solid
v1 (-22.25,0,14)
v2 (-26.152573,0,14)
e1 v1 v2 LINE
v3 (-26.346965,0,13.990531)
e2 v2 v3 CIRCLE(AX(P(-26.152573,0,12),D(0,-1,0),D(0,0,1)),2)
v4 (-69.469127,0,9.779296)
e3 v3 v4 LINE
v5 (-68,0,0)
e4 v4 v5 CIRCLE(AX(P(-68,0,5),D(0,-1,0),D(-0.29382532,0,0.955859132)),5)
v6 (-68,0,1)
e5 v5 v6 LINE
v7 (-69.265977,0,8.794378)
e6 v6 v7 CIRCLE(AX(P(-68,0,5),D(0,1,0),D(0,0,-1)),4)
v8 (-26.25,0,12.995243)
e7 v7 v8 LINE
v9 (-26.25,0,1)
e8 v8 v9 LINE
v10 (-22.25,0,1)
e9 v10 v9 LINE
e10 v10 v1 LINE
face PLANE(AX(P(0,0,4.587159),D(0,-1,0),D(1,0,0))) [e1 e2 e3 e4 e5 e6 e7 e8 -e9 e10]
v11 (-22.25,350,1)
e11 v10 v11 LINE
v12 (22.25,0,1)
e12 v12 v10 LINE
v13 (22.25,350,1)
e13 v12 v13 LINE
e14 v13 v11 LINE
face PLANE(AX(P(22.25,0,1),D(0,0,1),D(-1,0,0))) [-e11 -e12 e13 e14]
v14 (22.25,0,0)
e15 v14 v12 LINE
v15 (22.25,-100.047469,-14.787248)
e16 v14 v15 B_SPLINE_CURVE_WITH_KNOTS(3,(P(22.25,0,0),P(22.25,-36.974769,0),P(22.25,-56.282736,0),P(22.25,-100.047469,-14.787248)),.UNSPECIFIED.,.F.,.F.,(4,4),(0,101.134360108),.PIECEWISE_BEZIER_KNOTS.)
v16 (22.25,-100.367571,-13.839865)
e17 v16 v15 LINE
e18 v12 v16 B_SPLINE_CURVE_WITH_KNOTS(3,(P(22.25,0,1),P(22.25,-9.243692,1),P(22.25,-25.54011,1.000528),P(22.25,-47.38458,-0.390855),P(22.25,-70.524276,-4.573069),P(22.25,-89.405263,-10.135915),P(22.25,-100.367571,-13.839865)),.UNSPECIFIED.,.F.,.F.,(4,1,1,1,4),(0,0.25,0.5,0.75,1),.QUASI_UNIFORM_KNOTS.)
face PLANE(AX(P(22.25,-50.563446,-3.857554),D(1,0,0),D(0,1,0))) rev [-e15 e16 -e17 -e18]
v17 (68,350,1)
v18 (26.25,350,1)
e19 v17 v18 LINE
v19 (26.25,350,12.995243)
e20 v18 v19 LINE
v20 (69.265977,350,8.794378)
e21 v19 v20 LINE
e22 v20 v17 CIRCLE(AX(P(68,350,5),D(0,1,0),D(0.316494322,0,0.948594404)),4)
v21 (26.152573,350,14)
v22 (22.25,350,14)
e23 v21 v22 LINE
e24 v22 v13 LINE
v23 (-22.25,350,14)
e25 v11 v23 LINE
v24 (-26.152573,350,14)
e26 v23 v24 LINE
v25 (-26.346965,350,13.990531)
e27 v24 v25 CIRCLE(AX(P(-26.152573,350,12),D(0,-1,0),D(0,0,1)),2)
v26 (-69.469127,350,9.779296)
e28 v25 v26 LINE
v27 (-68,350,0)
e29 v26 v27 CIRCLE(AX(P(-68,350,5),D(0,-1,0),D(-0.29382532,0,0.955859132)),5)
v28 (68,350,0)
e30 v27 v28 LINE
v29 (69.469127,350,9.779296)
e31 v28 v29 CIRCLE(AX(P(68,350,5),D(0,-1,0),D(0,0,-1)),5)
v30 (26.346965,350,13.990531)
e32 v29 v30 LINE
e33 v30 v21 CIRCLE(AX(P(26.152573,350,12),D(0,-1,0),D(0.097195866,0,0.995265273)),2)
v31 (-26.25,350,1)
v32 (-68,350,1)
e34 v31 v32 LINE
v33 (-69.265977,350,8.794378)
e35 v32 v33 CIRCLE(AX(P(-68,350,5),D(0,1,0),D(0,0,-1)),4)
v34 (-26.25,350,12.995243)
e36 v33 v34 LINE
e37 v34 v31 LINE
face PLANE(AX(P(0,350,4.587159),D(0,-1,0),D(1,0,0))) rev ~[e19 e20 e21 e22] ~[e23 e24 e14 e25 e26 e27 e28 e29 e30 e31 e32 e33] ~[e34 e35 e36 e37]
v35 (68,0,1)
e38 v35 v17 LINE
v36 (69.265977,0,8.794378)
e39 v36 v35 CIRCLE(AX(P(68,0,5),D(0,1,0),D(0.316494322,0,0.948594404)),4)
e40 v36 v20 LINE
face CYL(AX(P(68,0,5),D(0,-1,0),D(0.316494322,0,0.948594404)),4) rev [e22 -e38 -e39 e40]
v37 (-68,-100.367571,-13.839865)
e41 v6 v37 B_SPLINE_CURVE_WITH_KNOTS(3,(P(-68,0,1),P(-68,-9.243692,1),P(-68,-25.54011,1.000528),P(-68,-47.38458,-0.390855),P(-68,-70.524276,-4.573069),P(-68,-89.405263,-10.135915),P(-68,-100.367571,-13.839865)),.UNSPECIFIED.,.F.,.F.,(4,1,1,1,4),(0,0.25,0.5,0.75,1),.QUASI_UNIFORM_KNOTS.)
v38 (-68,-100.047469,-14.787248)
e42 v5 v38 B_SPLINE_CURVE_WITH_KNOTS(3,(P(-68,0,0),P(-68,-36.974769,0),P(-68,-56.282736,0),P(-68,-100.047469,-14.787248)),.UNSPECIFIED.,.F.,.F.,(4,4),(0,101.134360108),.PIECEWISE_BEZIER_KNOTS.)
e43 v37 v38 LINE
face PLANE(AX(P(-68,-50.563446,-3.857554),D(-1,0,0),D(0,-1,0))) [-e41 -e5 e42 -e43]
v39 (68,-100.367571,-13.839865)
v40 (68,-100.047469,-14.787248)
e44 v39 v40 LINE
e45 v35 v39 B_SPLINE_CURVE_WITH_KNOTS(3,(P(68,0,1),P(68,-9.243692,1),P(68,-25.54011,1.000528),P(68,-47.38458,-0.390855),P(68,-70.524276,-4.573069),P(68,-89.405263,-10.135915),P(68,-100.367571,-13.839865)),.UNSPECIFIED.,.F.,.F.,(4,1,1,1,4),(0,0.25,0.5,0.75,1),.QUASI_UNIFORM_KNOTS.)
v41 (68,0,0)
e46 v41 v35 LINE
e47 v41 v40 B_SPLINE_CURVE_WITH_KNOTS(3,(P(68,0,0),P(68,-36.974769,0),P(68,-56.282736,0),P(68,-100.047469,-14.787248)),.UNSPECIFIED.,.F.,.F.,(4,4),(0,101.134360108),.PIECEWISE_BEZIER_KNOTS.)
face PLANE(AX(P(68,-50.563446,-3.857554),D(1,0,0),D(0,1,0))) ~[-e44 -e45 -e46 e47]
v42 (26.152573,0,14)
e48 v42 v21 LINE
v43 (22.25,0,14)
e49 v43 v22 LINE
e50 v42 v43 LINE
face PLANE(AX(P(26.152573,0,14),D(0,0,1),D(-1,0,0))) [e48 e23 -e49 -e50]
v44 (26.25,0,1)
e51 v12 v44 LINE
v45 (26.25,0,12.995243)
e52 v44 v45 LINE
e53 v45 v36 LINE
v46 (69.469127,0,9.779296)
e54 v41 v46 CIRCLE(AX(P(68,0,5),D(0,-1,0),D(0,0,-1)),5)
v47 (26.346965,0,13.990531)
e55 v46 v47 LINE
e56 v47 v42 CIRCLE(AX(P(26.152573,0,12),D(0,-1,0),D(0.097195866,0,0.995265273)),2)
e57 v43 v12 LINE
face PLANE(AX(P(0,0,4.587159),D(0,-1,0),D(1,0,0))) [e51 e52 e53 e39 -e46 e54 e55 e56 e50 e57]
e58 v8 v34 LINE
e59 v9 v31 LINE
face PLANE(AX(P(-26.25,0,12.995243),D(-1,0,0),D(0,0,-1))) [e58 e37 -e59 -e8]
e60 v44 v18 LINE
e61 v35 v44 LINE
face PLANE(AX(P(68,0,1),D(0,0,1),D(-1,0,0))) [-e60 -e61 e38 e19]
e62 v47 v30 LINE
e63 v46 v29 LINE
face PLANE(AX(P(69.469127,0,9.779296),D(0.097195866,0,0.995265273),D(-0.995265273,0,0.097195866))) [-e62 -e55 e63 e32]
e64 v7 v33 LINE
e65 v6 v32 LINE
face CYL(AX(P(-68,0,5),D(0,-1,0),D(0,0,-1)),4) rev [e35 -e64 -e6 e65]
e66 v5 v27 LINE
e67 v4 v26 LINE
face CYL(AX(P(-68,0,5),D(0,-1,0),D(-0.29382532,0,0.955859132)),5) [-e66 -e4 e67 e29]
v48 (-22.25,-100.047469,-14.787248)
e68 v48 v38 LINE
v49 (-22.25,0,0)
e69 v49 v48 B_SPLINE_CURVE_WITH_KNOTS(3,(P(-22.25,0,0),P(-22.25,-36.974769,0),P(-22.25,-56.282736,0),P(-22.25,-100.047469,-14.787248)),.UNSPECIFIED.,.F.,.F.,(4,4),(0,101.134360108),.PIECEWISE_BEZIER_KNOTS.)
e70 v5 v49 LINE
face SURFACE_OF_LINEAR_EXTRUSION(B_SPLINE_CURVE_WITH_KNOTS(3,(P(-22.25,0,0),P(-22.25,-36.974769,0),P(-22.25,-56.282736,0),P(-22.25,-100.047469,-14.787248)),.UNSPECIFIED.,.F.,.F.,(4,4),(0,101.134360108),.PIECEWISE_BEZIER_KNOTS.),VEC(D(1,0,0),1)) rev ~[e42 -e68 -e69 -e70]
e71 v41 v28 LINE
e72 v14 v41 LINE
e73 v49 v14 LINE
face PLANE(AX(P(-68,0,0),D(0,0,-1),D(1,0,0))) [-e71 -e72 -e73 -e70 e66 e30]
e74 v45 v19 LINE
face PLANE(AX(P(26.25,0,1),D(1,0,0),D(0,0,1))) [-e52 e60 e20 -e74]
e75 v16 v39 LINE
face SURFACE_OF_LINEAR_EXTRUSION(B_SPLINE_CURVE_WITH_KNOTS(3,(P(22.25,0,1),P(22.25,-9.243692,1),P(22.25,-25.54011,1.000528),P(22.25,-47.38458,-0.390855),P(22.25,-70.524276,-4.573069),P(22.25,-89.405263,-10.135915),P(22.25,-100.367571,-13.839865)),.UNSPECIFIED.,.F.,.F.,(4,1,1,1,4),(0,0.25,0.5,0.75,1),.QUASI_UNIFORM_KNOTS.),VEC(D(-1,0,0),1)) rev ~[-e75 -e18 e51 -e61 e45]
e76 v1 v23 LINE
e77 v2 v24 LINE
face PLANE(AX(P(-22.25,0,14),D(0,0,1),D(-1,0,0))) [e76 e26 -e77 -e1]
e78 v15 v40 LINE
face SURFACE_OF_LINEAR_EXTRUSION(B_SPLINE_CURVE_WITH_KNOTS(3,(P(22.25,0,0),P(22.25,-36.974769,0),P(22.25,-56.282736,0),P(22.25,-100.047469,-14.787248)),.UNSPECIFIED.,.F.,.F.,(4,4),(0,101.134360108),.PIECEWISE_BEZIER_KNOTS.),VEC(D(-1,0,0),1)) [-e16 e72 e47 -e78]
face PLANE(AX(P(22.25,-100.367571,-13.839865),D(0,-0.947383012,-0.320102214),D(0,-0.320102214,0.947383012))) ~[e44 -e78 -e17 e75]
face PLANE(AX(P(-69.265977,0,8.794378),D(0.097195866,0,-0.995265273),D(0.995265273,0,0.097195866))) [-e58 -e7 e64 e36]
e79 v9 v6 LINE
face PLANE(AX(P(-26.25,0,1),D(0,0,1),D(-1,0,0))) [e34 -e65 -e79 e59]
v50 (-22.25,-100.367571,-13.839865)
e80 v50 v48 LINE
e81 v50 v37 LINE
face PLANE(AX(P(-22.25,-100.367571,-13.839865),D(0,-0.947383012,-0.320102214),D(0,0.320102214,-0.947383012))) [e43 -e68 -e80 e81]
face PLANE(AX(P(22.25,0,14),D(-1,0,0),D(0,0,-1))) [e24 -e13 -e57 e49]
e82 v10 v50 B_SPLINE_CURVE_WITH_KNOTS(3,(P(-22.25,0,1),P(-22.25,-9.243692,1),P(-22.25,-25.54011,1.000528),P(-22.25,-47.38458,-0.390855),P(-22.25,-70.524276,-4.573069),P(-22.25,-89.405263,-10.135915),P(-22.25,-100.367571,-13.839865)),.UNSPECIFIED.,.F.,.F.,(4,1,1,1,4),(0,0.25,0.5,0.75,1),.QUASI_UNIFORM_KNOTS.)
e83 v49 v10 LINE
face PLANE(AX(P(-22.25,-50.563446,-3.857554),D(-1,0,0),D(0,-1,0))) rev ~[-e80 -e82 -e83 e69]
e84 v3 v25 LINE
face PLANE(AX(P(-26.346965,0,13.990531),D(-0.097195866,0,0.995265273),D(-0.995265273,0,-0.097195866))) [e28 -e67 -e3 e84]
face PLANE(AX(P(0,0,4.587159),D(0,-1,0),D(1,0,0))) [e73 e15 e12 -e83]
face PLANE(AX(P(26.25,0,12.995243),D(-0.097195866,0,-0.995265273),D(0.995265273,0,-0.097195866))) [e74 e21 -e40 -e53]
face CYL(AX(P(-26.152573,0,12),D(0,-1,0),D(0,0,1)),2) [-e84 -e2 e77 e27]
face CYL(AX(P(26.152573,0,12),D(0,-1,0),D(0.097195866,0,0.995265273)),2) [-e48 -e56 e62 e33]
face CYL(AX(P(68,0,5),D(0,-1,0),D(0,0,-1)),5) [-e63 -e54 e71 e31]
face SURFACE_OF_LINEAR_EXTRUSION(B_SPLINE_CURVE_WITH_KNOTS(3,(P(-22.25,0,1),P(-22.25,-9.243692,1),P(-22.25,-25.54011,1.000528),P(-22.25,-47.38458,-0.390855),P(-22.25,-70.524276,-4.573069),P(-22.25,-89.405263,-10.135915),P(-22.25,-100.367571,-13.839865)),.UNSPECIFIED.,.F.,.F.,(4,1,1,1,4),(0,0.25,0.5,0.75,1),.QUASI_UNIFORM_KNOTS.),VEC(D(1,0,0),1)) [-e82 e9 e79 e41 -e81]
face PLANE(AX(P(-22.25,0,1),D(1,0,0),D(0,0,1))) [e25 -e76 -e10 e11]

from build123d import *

# Parameters (mm, degrees)
F1_DEPTH = 350
F4_DEPTH = 45.75


with BuildPart() as f1:
    # F0 (on Front) → F1 (new body)
    with BuildSketch(Plane.XZ):
        with BuildLine():
            ThreePointArc((-69.4691266018, 9.7792956623), (-72.9445160689, 4.257193939), (-68, 0))
            Line((-68, 0), (0, 0))
            Line((0, 0), (68, 0))
            ThreePointArc((68, 0), (72.9445160689, 4.257193939), (69.4691266018, 9.7792956623))
            Line((69.4691266018, 9.7792956623), (26.3469652224, 13.9905305459))
            ThreePointArc((26.3469652224, 13.9905305459), (26.2498846097, 13.9976312337), (26.1525734896, 14))
            Line((26.1525734896, 14), (26.0150079844, 14))
            Line((26.0150079844, 14), (22.25, 14))
            Line((22.25, 14), (22.25, 1))
            Line((22.25, 1), (0, 1))
            Line((0, 1), (-22.25, 1))
            Line((-22.25, 1), (-22.25, 14))
            Line((-22.25, 14), (-26.0150079844, 14))
            Line((-26.0150079844, 14), (-26.1525734896, 14))
            ThreePointArc((-26.1525734896, 14), (-26.2498846097, 13.9976312337), (-26.3469652224, 13.9905305459))
            Line((-26.3469652224, 13.9905305459), (-69.4691266018, 9.7792956623))
        make_face()
        with BuildLine():
            Line((-26.25, 12.9720028672), (-26.25, 1))
            Line((-26.25, 1), (-68, 1))
            ThreePointArc((-68, 1), (-71.9482597731, 4.3587163152), (-69.265977288, 8.7943776178))
            Line((-69.265977288, 8.7943776178), (-26.25, 12.9952427487))
            Line((-26.25, 12.9952427487), (-26.25, 12.9720028672))
        make_face(mode=Mode.SUBTRACT)
        with BuildLine():
            Line((68, 1), (26.25, 1))
            Line((26.25, 1), (26.25, 12.9720028672))
            Line((26.25, 12.9720028672), (26.25, 12.9952427487))
            Line((26.25, 12.9952427487), (69.265977288, 8.7943776178))
            ThreePointArc((69.265977288, 8.7943776178), (71.9482597731, 4.3587163152), (68, 1))
        make_face(mode=Mode.SUBTRACT)
    extrude(amount=-F1_DEPTH)

    # F3 (on offset) → F4 (join)
    with BuildSketch(Plane.YZ.offset(-22.25)):
        with BuildLine():
            add(Edge.make_bspline(
                [(0, 0), (-36.9747690856, 0), (-56.282736361, 0), (-100.0474691391, -14.7872483358)],
                knots=[0, 0, 0, 0, 101.1343601081, 101.1343601081, 101.1343601081, 101.1343601081], degree=3))
            Line((0, 0), (0, 1))
            add(Edge.make_bspline(
                [(0, 1), (-9.2436922714, 1), (-25.5401100661, 1.0005275684), (-47.3845795682, -0.3908549289), (-70.5242758511, -4.5730687745), (-89.4052629561, -10.135915446), (-100.3675713535, -13.8398653233)],
                knots=[0, 0, 0, 0, 0.25, 0.5, 0.75, 1, 1, 1, 1], degree=3))
            Line((-100.3675713535, -13.8398653233), (-100.0474691391, -14.7872483358))
        make_face()
    extrude(amount=-F4_DEPTH)

    # F5: F1 across plane


with BuildPart() as f1_1:
    add(f1.part)
    add(f1.part.mirror(Plane.YZ))


solid = f1_1.part
